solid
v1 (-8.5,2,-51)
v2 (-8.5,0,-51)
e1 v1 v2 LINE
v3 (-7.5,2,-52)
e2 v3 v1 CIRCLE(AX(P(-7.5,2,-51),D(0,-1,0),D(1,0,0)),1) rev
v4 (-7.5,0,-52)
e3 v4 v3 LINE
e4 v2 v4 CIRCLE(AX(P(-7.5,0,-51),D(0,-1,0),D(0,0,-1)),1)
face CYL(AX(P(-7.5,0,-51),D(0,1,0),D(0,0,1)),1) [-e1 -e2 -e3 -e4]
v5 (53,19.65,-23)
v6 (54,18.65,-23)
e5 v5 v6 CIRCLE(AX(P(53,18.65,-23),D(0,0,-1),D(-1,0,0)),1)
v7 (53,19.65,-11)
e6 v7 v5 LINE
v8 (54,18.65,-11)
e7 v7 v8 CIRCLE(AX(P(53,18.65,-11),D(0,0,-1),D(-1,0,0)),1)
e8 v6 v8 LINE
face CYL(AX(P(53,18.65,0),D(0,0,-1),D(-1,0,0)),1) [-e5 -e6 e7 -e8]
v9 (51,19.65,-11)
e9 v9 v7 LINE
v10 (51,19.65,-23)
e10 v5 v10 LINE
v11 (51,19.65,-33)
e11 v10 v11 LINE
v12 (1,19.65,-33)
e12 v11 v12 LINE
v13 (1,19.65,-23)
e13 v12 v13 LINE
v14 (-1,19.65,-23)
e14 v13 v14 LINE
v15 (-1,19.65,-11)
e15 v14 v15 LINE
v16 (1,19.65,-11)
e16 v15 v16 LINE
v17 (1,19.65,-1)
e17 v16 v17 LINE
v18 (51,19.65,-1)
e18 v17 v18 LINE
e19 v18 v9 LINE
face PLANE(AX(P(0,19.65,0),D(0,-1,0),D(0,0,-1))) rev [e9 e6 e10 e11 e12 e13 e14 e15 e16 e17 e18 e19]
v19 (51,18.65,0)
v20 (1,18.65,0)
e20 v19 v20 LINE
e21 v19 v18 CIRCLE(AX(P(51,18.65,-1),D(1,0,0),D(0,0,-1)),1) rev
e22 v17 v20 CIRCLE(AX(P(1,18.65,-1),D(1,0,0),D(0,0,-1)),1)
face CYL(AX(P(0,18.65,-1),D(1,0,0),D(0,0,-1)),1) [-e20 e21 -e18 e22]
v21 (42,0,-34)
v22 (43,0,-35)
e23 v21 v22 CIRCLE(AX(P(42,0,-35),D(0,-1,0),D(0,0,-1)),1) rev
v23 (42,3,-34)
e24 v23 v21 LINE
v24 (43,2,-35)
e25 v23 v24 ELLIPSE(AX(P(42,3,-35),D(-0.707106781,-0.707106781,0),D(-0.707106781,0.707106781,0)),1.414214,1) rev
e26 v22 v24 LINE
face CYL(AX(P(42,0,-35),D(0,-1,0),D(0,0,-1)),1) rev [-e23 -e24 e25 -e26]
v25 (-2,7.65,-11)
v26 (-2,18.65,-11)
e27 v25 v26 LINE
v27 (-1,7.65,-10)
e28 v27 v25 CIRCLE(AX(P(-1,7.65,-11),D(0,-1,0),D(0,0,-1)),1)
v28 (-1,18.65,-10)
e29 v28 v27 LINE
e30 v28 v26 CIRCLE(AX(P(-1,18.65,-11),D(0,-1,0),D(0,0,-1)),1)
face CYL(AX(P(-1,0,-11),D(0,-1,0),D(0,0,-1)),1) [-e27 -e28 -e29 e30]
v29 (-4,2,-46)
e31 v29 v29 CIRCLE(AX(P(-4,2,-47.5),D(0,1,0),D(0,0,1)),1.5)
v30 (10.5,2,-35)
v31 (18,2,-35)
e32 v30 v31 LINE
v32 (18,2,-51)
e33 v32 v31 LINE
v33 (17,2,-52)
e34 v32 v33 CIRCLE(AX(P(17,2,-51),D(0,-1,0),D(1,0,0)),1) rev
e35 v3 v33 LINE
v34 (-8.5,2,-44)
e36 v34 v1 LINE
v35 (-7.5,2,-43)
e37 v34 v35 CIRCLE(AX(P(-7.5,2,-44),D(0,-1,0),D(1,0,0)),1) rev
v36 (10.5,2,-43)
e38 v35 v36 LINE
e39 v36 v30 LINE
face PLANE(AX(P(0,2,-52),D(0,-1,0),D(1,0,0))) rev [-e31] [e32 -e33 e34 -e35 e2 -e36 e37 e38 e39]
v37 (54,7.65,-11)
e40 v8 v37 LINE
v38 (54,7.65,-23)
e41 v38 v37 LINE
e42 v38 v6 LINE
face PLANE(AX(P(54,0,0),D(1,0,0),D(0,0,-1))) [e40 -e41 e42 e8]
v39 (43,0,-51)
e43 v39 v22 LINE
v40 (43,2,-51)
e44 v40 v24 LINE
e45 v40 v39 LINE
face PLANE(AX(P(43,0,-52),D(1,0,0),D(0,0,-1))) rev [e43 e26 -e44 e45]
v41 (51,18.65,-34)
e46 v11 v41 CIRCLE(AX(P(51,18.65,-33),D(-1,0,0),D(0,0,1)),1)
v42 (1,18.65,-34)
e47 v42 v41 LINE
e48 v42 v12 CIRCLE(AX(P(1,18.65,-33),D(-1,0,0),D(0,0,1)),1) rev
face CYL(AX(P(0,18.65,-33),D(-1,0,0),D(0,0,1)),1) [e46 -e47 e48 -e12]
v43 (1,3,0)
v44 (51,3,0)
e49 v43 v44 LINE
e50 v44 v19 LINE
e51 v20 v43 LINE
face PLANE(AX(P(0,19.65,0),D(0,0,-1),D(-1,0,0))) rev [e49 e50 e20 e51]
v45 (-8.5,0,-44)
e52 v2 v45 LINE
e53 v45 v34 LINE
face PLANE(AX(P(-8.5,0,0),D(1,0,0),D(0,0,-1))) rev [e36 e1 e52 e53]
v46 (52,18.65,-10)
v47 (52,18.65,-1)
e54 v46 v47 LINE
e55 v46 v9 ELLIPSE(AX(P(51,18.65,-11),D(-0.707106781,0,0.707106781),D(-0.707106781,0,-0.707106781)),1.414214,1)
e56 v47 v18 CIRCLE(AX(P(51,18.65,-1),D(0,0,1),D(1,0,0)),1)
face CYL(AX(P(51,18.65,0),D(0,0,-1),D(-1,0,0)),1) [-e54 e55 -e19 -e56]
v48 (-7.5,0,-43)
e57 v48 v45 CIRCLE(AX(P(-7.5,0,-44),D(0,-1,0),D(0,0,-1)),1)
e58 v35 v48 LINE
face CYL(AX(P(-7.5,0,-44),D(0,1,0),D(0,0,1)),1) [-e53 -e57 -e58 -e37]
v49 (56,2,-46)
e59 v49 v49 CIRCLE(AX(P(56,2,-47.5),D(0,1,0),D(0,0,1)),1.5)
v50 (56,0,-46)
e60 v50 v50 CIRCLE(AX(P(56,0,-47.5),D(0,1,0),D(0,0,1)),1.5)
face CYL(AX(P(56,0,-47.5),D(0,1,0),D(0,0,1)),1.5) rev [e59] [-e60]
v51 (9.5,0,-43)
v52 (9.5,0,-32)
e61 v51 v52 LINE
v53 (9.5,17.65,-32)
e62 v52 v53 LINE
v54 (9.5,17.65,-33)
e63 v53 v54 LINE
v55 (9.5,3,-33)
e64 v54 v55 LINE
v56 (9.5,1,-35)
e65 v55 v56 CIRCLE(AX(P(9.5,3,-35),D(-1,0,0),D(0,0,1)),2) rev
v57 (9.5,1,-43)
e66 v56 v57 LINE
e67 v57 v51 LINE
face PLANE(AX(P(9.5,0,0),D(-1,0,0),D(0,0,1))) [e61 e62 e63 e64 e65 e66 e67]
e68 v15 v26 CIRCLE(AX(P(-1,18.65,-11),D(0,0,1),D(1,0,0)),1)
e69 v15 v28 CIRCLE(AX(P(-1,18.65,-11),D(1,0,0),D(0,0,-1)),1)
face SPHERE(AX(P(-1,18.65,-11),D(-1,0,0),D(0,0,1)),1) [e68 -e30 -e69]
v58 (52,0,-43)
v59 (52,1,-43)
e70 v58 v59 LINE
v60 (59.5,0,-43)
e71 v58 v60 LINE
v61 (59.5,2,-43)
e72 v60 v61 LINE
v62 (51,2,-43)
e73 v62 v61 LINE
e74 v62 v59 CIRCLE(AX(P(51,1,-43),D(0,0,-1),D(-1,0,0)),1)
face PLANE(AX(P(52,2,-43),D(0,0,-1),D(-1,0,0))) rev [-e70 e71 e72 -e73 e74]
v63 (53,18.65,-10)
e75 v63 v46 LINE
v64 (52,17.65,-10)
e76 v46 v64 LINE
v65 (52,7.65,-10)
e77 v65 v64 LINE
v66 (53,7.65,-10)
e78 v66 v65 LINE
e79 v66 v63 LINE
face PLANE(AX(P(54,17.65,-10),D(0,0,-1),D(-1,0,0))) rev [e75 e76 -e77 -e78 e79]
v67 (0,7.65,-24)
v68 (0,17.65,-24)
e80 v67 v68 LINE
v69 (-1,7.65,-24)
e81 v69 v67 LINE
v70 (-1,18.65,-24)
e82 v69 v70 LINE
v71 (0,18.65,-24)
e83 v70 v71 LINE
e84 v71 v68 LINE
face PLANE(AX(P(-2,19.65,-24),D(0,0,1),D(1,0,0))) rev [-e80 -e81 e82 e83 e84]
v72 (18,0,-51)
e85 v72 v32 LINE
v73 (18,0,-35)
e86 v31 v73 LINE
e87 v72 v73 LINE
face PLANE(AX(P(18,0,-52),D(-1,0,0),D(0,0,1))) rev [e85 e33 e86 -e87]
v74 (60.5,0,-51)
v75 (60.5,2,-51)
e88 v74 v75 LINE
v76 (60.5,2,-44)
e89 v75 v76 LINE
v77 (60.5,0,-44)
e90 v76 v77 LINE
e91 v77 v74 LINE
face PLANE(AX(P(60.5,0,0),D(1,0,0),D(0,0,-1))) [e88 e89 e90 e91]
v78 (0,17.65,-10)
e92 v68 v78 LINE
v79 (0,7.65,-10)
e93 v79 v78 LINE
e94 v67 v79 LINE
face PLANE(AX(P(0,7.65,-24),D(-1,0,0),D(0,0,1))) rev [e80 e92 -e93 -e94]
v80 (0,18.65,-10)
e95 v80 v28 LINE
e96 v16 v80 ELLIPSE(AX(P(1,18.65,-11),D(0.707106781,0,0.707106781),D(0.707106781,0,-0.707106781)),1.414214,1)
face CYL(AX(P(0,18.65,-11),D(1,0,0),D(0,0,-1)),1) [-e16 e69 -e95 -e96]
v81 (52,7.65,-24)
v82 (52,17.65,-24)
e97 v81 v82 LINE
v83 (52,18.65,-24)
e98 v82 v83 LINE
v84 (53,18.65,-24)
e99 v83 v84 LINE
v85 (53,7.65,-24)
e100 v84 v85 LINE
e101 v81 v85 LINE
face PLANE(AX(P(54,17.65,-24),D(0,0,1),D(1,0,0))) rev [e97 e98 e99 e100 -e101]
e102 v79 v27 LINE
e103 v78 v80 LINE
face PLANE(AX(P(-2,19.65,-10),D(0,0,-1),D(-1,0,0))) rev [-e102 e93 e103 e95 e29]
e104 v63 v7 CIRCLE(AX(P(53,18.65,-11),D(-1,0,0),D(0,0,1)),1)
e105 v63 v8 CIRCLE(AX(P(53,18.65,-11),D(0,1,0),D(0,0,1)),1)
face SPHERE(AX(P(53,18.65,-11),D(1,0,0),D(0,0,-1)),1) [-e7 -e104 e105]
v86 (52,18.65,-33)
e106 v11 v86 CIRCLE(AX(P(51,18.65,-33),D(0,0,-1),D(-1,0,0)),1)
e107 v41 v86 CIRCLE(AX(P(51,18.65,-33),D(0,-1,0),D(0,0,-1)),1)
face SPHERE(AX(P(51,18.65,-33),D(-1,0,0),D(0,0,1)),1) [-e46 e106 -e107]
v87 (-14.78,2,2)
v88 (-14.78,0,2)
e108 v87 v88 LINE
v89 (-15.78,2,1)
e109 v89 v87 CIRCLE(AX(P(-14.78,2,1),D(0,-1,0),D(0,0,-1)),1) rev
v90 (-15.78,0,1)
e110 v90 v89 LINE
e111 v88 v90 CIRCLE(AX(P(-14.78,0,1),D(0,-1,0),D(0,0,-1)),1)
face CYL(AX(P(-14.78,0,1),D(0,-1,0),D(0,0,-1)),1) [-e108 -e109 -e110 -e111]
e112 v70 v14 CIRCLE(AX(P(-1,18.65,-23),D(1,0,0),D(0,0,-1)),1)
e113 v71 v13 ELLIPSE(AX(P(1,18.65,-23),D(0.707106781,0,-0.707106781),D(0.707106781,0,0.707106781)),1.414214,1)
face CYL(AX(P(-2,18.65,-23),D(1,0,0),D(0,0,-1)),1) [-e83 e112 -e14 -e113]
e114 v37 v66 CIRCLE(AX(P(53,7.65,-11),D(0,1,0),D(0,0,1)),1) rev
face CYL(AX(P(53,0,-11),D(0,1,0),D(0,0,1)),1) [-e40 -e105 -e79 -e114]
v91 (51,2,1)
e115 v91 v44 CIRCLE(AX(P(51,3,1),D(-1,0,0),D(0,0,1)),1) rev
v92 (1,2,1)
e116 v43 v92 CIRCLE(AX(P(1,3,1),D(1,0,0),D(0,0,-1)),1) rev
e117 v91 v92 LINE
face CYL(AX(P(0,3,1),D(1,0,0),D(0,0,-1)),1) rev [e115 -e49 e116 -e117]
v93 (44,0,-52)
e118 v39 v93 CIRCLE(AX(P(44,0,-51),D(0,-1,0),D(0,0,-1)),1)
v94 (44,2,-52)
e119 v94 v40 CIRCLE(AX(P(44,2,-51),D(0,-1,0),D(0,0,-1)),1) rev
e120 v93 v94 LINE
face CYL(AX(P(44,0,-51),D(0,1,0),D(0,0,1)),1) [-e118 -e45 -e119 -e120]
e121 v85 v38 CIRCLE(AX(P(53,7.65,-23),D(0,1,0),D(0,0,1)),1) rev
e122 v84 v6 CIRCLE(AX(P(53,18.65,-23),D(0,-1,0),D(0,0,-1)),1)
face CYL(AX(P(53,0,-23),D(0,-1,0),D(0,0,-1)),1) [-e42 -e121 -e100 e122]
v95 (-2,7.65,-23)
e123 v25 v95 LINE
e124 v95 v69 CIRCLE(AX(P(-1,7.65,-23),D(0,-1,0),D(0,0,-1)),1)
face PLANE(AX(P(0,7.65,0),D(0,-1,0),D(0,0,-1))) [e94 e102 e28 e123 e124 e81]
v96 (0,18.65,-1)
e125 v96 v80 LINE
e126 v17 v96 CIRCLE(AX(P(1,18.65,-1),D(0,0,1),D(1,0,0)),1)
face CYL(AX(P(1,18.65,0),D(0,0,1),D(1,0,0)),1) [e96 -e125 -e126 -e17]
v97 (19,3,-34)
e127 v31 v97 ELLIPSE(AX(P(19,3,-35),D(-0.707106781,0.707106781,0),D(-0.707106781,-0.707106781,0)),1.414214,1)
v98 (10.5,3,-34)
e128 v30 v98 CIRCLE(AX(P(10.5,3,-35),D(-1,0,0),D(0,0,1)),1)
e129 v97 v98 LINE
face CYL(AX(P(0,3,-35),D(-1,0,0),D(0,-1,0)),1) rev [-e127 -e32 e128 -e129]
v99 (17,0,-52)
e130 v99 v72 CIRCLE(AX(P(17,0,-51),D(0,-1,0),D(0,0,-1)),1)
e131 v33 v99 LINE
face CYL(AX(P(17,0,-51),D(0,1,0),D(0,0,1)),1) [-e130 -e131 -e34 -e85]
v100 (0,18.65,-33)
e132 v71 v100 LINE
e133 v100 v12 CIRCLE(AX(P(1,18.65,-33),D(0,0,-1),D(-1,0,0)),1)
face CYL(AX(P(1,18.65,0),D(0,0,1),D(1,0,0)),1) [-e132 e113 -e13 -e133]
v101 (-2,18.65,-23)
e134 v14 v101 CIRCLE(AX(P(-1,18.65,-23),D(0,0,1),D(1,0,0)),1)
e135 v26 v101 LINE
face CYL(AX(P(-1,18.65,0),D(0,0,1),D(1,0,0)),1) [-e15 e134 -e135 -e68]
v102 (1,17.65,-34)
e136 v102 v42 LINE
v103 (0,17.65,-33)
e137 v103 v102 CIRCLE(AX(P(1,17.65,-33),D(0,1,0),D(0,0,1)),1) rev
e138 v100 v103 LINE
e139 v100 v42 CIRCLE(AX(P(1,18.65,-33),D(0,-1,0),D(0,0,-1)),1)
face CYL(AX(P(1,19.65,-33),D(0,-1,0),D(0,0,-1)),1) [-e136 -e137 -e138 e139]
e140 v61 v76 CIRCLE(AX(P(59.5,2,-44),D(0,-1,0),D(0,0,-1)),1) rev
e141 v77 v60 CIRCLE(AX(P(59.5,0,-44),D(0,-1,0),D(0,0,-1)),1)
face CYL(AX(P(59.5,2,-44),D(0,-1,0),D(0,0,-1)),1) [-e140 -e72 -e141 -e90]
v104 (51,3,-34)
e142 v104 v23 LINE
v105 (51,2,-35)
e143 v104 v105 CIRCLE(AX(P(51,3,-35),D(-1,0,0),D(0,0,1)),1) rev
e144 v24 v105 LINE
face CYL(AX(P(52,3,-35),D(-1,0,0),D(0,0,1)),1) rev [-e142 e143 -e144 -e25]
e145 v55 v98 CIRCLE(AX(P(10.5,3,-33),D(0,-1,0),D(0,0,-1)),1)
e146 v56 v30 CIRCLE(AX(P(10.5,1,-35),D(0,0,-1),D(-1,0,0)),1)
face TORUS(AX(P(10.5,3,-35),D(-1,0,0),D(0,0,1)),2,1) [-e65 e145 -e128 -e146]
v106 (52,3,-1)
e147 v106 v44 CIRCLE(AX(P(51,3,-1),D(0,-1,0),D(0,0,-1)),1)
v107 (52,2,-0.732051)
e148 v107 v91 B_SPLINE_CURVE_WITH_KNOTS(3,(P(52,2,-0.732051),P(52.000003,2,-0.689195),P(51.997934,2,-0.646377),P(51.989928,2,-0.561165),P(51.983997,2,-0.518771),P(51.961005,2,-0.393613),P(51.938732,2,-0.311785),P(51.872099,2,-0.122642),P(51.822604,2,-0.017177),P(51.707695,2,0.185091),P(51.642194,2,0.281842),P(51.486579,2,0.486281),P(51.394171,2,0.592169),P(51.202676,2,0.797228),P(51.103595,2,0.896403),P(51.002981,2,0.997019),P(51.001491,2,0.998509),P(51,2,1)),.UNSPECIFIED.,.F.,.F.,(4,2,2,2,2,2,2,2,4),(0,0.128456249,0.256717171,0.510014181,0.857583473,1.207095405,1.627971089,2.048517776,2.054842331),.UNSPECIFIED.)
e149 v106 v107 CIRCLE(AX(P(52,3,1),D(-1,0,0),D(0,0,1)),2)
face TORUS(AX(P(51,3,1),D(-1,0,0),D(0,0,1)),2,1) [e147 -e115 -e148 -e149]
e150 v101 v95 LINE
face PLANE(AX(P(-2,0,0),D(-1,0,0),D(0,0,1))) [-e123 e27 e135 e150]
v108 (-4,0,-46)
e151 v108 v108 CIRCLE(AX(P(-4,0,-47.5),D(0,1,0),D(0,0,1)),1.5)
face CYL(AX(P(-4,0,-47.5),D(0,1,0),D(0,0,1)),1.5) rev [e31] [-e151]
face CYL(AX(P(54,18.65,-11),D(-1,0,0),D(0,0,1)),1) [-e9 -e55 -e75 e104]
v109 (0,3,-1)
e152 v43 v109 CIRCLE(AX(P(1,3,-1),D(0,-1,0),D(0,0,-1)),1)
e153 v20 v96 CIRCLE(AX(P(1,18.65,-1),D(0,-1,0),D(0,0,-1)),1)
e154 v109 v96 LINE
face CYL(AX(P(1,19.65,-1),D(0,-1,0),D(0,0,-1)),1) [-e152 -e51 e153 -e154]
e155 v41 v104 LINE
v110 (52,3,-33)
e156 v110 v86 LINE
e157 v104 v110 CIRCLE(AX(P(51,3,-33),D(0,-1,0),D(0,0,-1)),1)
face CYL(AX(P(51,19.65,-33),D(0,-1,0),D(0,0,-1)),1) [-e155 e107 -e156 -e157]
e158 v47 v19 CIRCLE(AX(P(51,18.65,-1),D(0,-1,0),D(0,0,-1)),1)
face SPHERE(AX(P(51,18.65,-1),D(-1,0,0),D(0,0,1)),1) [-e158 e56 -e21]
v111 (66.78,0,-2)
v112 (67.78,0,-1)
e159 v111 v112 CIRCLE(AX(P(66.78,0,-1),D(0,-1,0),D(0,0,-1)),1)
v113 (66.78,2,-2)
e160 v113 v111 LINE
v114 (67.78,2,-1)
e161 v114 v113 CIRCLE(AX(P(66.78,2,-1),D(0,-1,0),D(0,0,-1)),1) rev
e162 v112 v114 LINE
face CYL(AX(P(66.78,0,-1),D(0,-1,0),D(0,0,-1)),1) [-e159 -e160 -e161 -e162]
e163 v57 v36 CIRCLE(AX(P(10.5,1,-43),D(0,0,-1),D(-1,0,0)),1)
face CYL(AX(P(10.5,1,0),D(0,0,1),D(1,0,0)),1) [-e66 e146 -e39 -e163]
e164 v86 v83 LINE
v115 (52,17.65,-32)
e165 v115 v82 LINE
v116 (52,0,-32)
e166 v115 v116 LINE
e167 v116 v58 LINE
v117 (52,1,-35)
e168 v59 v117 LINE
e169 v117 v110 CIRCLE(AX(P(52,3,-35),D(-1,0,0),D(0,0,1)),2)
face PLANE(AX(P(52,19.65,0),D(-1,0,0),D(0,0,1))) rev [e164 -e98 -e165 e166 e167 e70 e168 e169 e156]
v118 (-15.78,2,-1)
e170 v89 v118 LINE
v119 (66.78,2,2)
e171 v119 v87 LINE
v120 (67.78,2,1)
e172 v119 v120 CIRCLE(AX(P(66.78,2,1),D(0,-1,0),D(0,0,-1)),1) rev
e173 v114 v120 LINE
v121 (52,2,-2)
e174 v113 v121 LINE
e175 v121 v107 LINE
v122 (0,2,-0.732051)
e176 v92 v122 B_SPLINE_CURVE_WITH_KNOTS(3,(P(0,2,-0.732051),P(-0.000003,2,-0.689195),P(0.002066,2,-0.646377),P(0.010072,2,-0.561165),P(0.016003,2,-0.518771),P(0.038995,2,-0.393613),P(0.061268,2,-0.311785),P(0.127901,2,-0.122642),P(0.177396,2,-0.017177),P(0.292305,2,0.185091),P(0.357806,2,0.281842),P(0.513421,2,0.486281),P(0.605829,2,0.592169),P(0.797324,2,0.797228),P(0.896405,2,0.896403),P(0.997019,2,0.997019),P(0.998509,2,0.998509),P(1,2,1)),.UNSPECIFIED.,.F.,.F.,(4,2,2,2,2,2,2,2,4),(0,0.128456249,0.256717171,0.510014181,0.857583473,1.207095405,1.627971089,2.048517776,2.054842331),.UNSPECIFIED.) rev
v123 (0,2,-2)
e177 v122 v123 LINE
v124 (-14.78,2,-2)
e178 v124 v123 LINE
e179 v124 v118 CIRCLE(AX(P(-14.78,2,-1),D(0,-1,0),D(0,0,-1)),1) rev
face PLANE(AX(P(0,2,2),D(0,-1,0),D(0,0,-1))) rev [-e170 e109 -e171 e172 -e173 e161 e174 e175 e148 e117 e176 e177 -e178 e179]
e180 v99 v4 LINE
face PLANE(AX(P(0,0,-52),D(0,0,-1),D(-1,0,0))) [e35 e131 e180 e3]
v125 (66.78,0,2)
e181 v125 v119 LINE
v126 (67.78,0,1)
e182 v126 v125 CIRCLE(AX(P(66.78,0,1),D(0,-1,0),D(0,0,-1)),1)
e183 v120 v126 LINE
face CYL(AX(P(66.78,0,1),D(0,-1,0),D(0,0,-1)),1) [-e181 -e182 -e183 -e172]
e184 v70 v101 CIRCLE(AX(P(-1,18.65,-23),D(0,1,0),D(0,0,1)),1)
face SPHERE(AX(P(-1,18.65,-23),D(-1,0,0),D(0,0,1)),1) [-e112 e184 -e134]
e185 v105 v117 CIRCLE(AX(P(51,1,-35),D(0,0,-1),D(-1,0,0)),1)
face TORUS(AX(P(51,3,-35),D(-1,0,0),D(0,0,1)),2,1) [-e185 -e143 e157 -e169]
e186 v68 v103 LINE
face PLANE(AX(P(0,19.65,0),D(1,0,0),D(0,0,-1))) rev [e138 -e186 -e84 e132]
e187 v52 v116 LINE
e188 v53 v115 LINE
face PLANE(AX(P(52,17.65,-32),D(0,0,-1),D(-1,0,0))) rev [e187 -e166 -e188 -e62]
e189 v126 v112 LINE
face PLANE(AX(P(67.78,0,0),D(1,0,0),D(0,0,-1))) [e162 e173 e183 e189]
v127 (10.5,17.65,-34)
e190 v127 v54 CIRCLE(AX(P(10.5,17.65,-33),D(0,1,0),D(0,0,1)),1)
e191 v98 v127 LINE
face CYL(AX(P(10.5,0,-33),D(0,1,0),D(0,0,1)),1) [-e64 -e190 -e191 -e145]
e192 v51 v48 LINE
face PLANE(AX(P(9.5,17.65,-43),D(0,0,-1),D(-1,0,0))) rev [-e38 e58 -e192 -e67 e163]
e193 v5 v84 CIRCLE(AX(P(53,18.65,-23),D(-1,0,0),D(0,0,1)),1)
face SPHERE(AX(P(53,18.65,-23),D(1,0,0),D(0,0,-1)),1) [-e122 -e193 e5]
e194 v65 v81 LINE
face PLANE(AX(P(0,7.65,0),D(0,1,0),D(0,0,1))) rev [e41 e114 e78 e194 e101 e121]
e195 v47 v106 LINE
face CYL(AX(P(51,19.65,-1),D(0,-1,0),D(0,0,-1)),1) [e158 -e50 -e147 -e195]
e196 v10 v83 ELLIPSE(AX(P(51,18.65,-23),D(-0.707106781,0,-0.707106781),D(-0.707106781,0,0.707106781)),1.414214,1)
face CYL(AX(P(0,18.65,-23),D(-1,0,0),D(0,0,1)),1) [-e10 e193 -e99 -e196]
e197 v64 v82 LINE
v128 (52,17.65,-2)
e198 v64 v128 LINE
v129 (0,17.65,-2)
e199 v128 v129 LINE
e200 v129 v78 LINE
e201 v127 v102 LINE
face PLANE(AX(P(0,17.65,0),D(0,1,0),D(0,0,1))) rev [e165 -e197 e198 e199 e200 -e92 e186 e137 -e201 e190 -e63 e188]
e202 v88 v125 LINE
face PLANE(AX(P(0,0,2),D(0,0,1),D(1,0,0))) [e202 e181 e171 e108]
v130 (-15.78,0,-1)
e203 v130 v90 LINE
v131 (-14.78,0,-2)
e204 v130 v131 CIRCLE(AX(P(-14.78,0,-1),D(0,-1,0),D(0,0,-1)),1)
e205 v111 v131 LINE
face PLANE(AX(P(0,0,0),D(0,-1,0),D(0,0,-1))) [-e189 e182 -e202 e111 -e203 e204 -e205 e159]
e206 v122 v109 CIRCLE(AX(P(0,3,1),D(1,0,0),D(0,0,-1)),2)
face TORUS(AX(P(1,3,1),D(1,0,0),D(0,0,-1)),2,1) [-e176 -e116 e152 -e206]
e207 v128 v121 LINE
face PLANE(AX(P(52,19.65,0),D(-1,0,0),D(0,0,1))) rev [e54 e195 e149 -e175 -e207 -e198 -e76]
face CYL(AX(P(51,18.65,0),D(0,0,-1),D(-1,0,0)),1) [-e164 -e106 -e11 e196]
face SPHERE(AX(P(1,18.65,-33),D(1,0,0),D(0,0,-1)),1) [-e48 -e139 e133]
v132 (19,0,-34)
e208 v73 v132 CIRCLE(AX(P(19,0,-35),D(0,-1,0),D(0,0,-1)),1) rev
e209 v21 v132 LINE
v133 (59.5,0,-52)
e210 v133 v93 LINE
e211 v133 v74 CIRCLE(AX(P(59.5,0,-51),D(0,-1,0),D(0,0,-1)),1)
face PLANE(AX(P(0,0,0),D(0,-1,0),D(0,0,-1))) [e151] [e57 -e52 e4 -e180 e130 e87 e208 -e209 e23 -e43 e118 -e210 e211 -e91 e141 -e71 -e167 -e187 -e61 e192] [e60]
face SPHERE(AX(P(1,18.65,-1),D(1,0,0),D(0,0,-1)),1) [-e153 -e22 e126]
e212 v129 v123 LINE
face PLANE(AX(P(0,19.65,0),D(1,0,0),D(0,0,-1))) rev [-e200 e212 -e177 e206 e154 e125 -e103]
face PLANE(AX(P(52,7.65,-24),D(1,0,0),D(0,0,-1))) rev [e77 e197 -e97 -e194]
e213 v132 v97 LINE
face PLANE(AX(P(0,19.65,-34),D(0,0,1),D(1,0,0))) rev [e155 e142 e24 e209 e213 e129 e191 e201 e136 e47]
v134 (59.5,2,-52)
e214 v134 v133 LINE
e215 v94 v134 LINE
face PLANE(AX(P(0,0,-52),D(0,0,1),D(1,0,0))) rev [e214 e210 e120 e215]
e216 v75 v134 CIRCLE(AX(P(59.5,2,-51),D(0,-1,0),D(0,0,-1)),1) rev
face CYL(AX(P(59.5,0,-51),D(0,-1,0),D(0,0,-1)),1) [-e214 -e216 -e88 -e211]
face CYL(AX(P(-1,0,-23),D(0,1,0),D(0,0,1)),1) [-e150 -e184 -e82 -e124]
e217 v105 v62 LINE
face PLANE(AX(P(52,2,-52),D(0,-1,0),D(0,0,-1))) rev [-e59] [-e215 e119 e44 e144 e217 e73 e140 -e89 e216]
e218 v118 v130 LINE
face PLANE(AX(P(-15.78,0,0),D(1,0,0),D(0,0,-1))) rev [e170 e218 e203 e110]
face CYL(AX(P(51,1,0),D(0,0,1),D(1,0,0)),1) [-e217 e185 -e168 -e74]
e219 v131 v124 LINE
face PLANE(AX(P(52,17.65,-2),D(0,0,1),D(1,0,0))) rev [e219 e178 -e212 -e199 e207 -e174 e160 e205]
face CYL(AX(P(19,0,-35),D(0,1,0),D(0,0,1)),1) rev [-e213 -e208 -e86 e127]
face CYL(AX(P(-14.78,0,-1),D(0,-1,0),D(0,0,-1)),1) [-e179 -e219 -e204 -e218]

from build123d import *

# Parameters (mm, degrees)
SKETCH1_W            = 52
SKETCH1_H            = 34
BOSS_EXTRUDE1_DEPTH  = 19.65
SKETCH2_W            = 52
SKETCH2_H            = 30
CUT_EXTRUDE1_DEPTH   = 17.65
SKETCH3_W            = 9
SKETCH3_H            = 2
SKETCH3_W_2          = 18
BOSS_EXTRUDE2_DEPTH  = 18
SKETCH4_W            = 18
SKETCH4_H            = 2
BOSS_EXTRUDE3_DEPTH  = 8.5
SKETCH5_W            = 18
SKETCH5_H            = 2
BOSS_EXTRUDE4_DEPTH  = 8.5
SKETCH6_R            = 1.5
CUT_EXTRUDE2_DEPTH   = 82.705400678
SKETCH7_W            = 52
SKETCH7_H            = 2
BOSS_EXTRUDE5_DEPTH  = 2
SKETCH8_W            = 4
SKETCH8_H            = 2
BOSS_EXTRUDE6_DEPTH  = 15.78
SKETCH9_W            = 4
SKETCH9_H            = 2
BOSS_EXTRUDE7_DEPTH  = 15.78
SKETCH11_W           = 11
SKETCH11_H           = 17.65
CUT_EXTRUDE3_DEPTH   = 18
SKETCH12_W           = 9
SKETCH12_H           = 2
CUT_EXTRUDE4_DEPTH   = 8.5
SKETCH14_W           = 14
SKETCH14_H           = 2
BOSS_EXTRUDE8_DEPTH  = 2
SKETCH15_W           = 14
SKETCH15_H           = 2
BOSS_EXTRUDE9_DEPTH  = 2
SKETCH16_W           = 2
SKETCH16_H           = 14
BOSS_EXTRUDE10_DEPTH = 10
FILLET1_R            = 1
FILLET2_R            = 1
FILLET3_R            = 1
FILLET4_R            = 1


with BuildPart() as part:
    # Sketch1 → Boss-Extrude1 (new body)
    with BuildSketch(Plane(origin=(0, 0, 0), x_dir=(1, 0, 0), z_dir=(0, 1, 0))):
        with Locations((26, 17)):
            Rectangle(SKETCH1_W, SKETCH1_H)
    extrude(amount=BOSS_EXTRUDE1_DEPTH)

    # Sketch2 → Cut-Extrude1 (cut)
    with BuildSketch(Plane(origin=(0, 0, 0), x_dir=(-1, 0, 0), z_dir=(0, -1, 0))):
        with Locations((-26, 17)):
            Rectangle(SKETCH2_W, SKETCH2_H)
    extrude(amount=-CUT_EXTRUDE1_DEPTH, mode=Mode.SUBTRACT)

    # Sketch3 → Boss-Extrude2 (add)
    with BuildSketch(Plane(origin=(0, 0, -34), x_dir=(-1, 0, 0), z_dir=(0, 0, -1))):
        with Locations((-47.5, 1)):
            Rectangle(SKETCH3_W, SKETCH3_H)
        with Locations((-9, 1)):
            Rectangle(SKETCH3_W_2, SKETCH3_H)
    extrude(amount=BOSS_EXTRUDE2_DEPTH)

    # Sketch4 → Boss-Extrude3 (add)
    with BuildSketch(Plane(origin=(52, 0, 0), x_dir=(0, 0, -1), z_dir=(1, 0, 0))):
        with Locations((43, 1)):
            Rectangle(SKETCH4_W, SKETCH4_H)
    extrude(amount=BOSS_EXTRUDE3_DEPTH)

    # Sketch5 → Boss-Extrude4 (add)
    with BuildSketch(Plane.ZY):
        with Locations((-43, 1)):
            Rectangle(SKETCH5_W, SKETCH5_H)
    extrude(amount=BOSS_EXTRUDE4_DEPTH)

    # Sketch6 → Cut-Extrude2 (cut, through all)
    with BuildSketch(Plane(origin=(0, 2, 0), x_dir=(1, 0, 0), z_dir=(0, 1, 0))):
        with Locations(Location((56, 47.5, 0), (0, 0, 270))):
            Circle(SKETCH6_R)
        with Locations(Location((-4, 47.5, 0), (0, 0, 270))):
            Circle(SKETCH6_R)
    extrude(amount=-CUT_EXTRUDE2_DEPTH, mode=Mode.SUBTRACT)

    # Sketch7 → Boss-Extrude5 (add)
    with BuildSketch(Plane.XY):
        with Locations((26, 1)):
            Rectangle(SKETCH7_W, SKETCH7_H)
    extrude(amount=BOSS_EXTRUDE5_DEPTH)

    # Sketch8 → Boss-Extrude6 (add)
    with BuildSketch(Plane.ZY):
        with Locations((0, 1)):
            Rectangle(SKETCH8_W, SKETCH8_H)
    extrude(amount=BOSS_EXTRUDE6_DEPTH)

    # Sketch9 → Boss-Extrude7 (add)
    with BuildSketch(Plane(origin=(52, 0, 0), x_dir=(0, 0, -1), z_dir=(1, 0, 0))):
        with Locations((0, 1)):
            Rectangle(SKETCH9_W, SKETCH9_H)
    extrude(amount=BOSS_EXTRUDE7_DEPTH)

    # Sketch11 → Cut-Extrude3 (cut)
    with BuildSketch(Plane.ZY.offset(8.5)):
        with Locations((-37.5, 8.825)):
            Rectangle(SKETCH11_W, SKETCH11_H)
    extrude(amount=-CUT_EXTRUDE3_DEPTH, mode=Mode.SUBTRACT)

    # Sketch12 → Cut-Extrude4 (cut)
    with BuildSketch(Plane(origin=(60.5, 0, 0), x_dir=(0, 0, -1), z_dir=(1, 0, 0))):
        with Locations((38.5, 1)):
            Rectangle(SKETCH12_W, SKETCH12_H)
    extrude(amount=-CUT_EXTRUDE4_DEPTH, mode=Mode.SUBTRACT)

    # Sketch14 → Boss-Extrude8 (add)
    with BuildSketch(Plane.ZY):
        with Locations((-17, 18.65)):
            Rectangle(SKETCH14_W, SKETCH14_H)
    extrude(amount=BOSS_EXTRUDE8_DEPTH)

    # Sketch15 → Boss-Extrude9 (add)
    with BuildSketch(Plane(origin=(52, 0, 0), x_dir=(0, 0, -1), z_dir=(1, 0, 0))):
        with Locations((17, 18.65)):
            Rectangle(SKETCH15_W, SKETCH15_H)
    extrude(amount=BOSS_EXTRUDE9_DEPTH)

    # Sketch16 → Boss-Extrude10 (add)
    with BuildSketch(Plane(origin=(0, 17.65, 0), x_dir=(-1, 0, 0), z_dir=(0, -1, 0))):
        with Locations((1, 17)):
            Rectangle(SKETCH16_W, SKETCH16_H)
        with Locations((-53, 17)):
            Rectangle(SKETCH16_W, SKETCH16_H)
    extrude(amount=BOSS_EXTRUDE10_DEPTH)

    # Fillet1
    fillet1_edges = [part.edges().sort_by_distance(p)[0] for p in [
        (13.75, 2, -34),
        (26, 19.65, -34),
        (43, 1, -34),
        (47.5, 2, -34),
        (18, 1, -34),
        (26, 19.65, 0),
        (26, 2, 0),
    ]]
    fillet(fillet1_edges, radius=FILLET1_R)

    # Fillet2
    # the kernel refuses this fillet: 1 mm, written as the material it takes off along each edge
    with BuildSketch(Plane(origin=(9.5, 2, -35), x_dir=(0, -1, 0), z_dir=(0, 0, -1))) as fillet2_piece_1:
        with BuildLine():
            CenterArc((FILLET2_R, -FILLET2_R), FILLET2_R, 90, 90)
            Line((0, -FILLET2_R), (0, 0))
            Line((0, 0), (FILLET2_R, 0))
        make_face()
    extrude(amount=8, mode=Mode.SUBTRACT)
    with BuildSketch(Plane(origin=(9.5, 3, -35), x_dir=(0, 0, 1), z_dir=(0, 1, 0))) as fillet2_piece_2:
        with BuildLine():
            CenterArc((1 + FILLET2_R, FILLET2_R), FILLET2_R, 180, 90)
            Line((1, FILLET2_R), (1, 0))
            Line((1, 0), (1 + FILLET2_R, 0))
        make_face()
    revolve(axis=Axis((9.5, 3, -35), (1, 0, 0)), revolution_arc=90, mode=Mode.SUBTRACT)
    with BuildSketch(Plane(origin=(0, 15.15, -34), x_dir=(0, 0, 1), z_dir=(0, 1, 0))) as fillet2_piece_3:
        with BuildLine():
            CenterArc((FILLET2_R, FILLET2_R), FILLET2_R, 180, 90)
            Line((0, FILLET2_R), (0, 0))
            Line((0, 0), (FILLET2_R, 0))
        make_face()
    extrude(amount=3.5, mode=Mode.SUBTRACT)
    with BuildSketch(Plane(origin=(0, 18.65, -33), x_dir=(0, 0, -1), z_dir=(0, -1, 0))) as fillet2_piece_4:
        with BuildLine():
            CenterArc((1 - FILLET2_R, FILLET2_R), FILLET2_R, 270, 90)
            Line((1, FILLET2_R), (1, 0))
            Line((1, 0), (1 - FILLET2_R, 0))
        make_face()
    revolve(axis=Axis((0, 18.65, -33), (1, 0, 0)), revolution_arc=90, mode=Mode.SUBTRACT)
    with BuildSketch(Plane(origin=(0, 3, 1), x_dir=(0, 0, -1), z_dir=(0, 1, 0))) as fillet2_piece_5_section:
        with BuildLine():
            CenterArc((1 + FILLET2_R, -FILLET2_R), FILLET2_R, 90, 90)
            Line((1, -FILLET2_R), (1, 0))
            Line((1, 0), (1 + FILLET2_R, 0))
        make_face()
    fillet2_piece_5 = revolve(axis=Axis((0, 3, 1), (-1, 0, 0)), revolution_arc=233.296989237, mode=Mode.PRIVATE)
    fillet2_piece_5 = split(fillet2_piece_5, bisect_by=Plane(origin=(0, 2, 1), z_dir=(0, 1, 0)), keep=Keep.TOP, mode=Mode.PRIVATE)
    add(fillet2_piece_5, mode=Mode.SUBTRACT)
    with BuildSketch(Plane(origin=(0, 3, 0), x_dir=(1, 0, 0), z_dir=(0, 1, 0)), Plane(origin=(52, 3, -34), x_dir=(-1, 0, 0), z_dir=(0, 1, 0))) as fillet2_piece_6:
        with BuildLine():
            CenterArc((FILLET2_R, FILLET2_R), FILLET2_R, 180, 90)
            Line((0, FILLET2_R), (0, 0))
            Line((0, 0), (FILLET2_R, 0))
        make_face()
    extrude(amount=15.65, mode=Mode.SUBTRACT)
    with BuildSketch(Plane(origin=(0, 18.65, -1), x_dir=(0, 0, 1), z_dir=(0, -1, 0))) as fillet2_piece_7:
        with BuildLine():
            CenterArc((1 - FILLET2_R, -FILLET2_R), FILLET2_R, 0, 90)
            Line((1, -FILLET2_R), (1, 0))
            Line((1, 0), (1 - FILLET2_R, 0))
        make_face()
    revolve(axis=Axis((0, 18.65, -1), (-1, 0, 0)), revolution_arc=90, mode=Mode.SUBTRACT)
    with BuildSketch(Plane(origin=(52, 2, -43), x_dir=(-1, 0, 0), z_dir=(0, 0, 1))) as fillet2_piece_8:
        with BuildLine():
            CenterArc((FILLET2_R, FILLET2_R), FILLET2_R, 180, 90)
            Line((0, FILLET2_R), (0, 0))
            Line((0, 0), (FILLET2_R, 0))
        make_face()
    extrude(amount=8, mode=Mode.SUBTRACT)
    with BuildSketch(Plane(origin=(52, 3, -35), x_dir=(0, 0, 1), z_dir=(0, 1, 0))) as fillet2_piece_9:
        with BuildLine():
            CenterArc((1 + FILLET2_R, -FILLET2_R), FILLET2_R, 90, 90)
            Line((1 + FILLET2_R, 0), (1, 0))
            Line((1, 0), (1, -FILLET2_R))
        make_face()
    revolve(axis=Axis((52, 3, -35), (1, 0, 0)), revolution_arc=90, mode=Mode.SUBTRACT)
    with BuildSketch(Plane(origin=(52, 18.65, -33), x_dir=(0, 0, -1), z_dir=(0, -1, 0))) as fillet2_piece_10:
        with BuildLine():
            CenterArc((1 - FILLET2_R, -FILLET2_R), FILLET2_R, 0, 90)
            Line((1 - FILLET2_R, 0), (1, 0))
            Line((1, 0), (1, -FILLET2_R))
        make_face()
    revolve(axis=Axis((52, 18.65, -33), (1, 0, 0)), revolution_arc=90, mode=Mode.SUBTRACT)
    with BuildSketch(Plane(origin=(52, 3, 1), x_dir=(0, 0, -1), z_dir=(0, 1, 0))) as fillet2_piece_11_section:
        with BuildLine():
            CenterArc((1 + FILLET2_R, FILLET2_R), FILLET2_R, 180, 90)
            Line((1 + FILLET2_R, 0), (1, 0))
            Line((1, 0), (1, FILLET2_R))
        make_face()
    fillet2_piece_11 = revolve(axis=Axis((52, 3, 1), (-1, 0, 0)), revolution_arc=233.296989237, mode=Mode.PRIVATE)
    fillet2_piece_11 = split(fillet2_piece_11, bisect_by=Plane(origin=(52, 2, 1), z_dir=(0, 1, 0)), keep=Keep.TOP, mode=Mode.PRIVATE)
    add(fillet2_piece_11, mode=Mode.SUBTRACT)
    with BuildSketch(Plane(origin=(52, 3, 0), x_dir=(-1, 0, 0), z_dir=(0, 1, 0))) as fillet2_piece_12:
        with BuildLine():
            CenterArc((FILLET2_R, -FILLET2_R), FILLET2_R, 90, 90)
            Line((0, -FILLET2_R), (0, 0))
            Line((0, 0), (FILLET2_R, 0))
        make_face()
    extrude(amount=15.65, mode=Mode.SUBTRACT)
    with BuildSketch(Plane(origin=(52, 18.65, -1), x_dir=(0, 0, 1), z_dir=(0, -1, 0))) as fillet2_piece_13:
        with BuildLine():
            CenterArc((1 - FILLET2_R, FILLET2_R), FILLET2_R, 270, 90)
            Line((1 - FILLET2_R, 0), (1, 0))
            Line((1, 0), (1, FILLET2_R))
        make_face()
    revolve(axis=Axis((52, 18.65, -1), (-1, 0, 0)), revolution_arc=90, mode=Mode.SUBTRACT)
    with BuildSketch(Plane(origin=(9.5, 3, -34), x_dir=(1, 0, 0), z_dir=(0, 1, 0))) as fillet2_piece_14:
        with BuildLine():
            CenterArc((FILLET2_R, -FILLET2_R), FILLET2_R, 90, 90)
            Line((0, -FILLET2_R), (0, 0))
            Line((0, 0), (FILLET2_R, 0))
        make_face()
    extrude(amount=14.65, mode=Mode.SUBTRACT)
    with BuildSketch(Plane(origin=(0, 19.65, -24), x_dir=(0, 0, 1), z_dir=(-1, 0, 0)), Plane(origin=(52, 19.65, -10), x_dir=(0, 0, -1), z_dir=(1, 0, 0))) as fillet2_piece_15:
        with BuildLine():
            CenterArc((FILLET2_R, -FILLET2_R), FILLET2_R, 90, 90)
            Line((0, -FILLET2_R), (0, 0))
            Line((0, 0), (FILLET2_R, 0))
        make_face()
    extrude(amount=4.5, mode=Mode.SUBTRACT)
    with BuildSketch(Plane(origin=(0, 19.65, -33), x_dir=(1, 0, 0), z_dir=(0, 0, 1)), Plane(origin=(52, 19.65, -24), x_dir=(-1, 0, 0), z_dir=(0, 0, -1)), Plane(origin=(52, 19.65, -1), x_dir=(-1, 0, 0), z_dir=(0, 0, -1))) as fillet2_piece_16:
        with BuildLine():
            CenterArc((FILLET2_R, -FILLET2_R), FILLET2_R, 90, 90)
            Line((0, -FILLET2_R), (0, 0))
            Line((0, 0), (FILLET2_R, 0))
        make_face()
    extrude(amount=9, mode=Mode.SUBTRACT)
    with BuildSketch(Plane(origin=(0, 19.65, -10), x_dir=(0, 0, -1), z_dir=(-1, 0, 0)), Plane(origin=(52, 19.65, -24), x_dir=(0, 0, 1), z_dir=(1, 0, 0))) as fillet2_piece_17:
        with BuildLine():
            CenterArc((FILLET2_R, FILLET2_R), FILLET2_R, 180, 90)
            Line((0, FILLET2_R), (0, 0))
            Line((0, 0), (FILLET2_R, 0))
        make_face()
    extrude(amount=4.5, mode=Mode.SUBTRACT)
    with BuildSketch(Plane(origin=(0, 19.65, -10), x_dir=(0, -1, 0), z_dir=(0, 0, 1))) as fillet2_piece_18:
        with BuildLine():
            CenterArc((FILLET2_R, FILLET2_R), FILLET2_R, 180, 90)
            Line((0, FILLET2_R), (0, 0))
            Line((0, 0), (FILLET2_R, 0))
        make_face()
    extrude(amount=9, mode=Mode.SUBTRACT)
    with BuildSketch(Plane(origin=(2.5, 19.65, -24), x_dir=(0, 0, 1), z_dir=(-1, 0, 0))) as fillet2_piece_19a_section:
        with BuildLine():
            CenterArc((FILLET2_R, -FILLET2_R), FILLET2_R, 90, 90)
            Line((0, -FILLET2_R), (0, 0))
            Line((0, 0), (FILLET2_R, 0))
        make_face()
    fillet2_piece_19a = extrude(amount=4.5, mode=Mode.PRIVATE)
    fillet2_piece_19a = split(fillet2_piece_19a, bisect_by=Plane(origin=(0, 19.65, -24), z_dir=(1, 0, 0)), keep=Keep.TOP, mode=Mode.PRIVATE)
    with BuildSketch(Plane(origin=(0, 19.65, -33), x_dir=(1, 0, 0), z_dir=(0, 0, 1))) as fillet2_piece_19b_section:
        with BuildLine():
            CenterArc((FILLET2_R, -FILLET2_R), FILLET2_R, 90, 90)
            Line((0, -FILLET2_R), (0, 0))
            Line((0, 0), (FILLET2_R, 0))
        make_face()
    fillet2_piece_19b = extrude(amount=11.5, mode=Mode.PRIVATE)
    fillet2_piece_19b = split(fillet2_piece_19b, bisect_by=Plane(origin=(0, 19.65, -24), z_dir=(0, 0, 1)), keep=Keep.TOP, mode=Mode.PRIVATE)
    fillet2_piece_19 = fillet2_piece_19a & fillet2_piece_19b
    add(fillet2_piece_19, mode=Mode.SUBTRACT)
    with BuildSketch(Plane(origin=(0, 19.65, -12.5), x_dir=(0, -1, 0), z_dir=(0, 0, 1))) as fillet2_piece_20a_section:
        with BuildLine():
            CenterArc((FILLET2_R, FILLET2_R), FILLET2_R, 180, 90)
            Line((0, FILLET2_R), (0, 0))
            Line((0, 0), (FILLET2_R, 0))
        make_face()
    fillet2_piece_20a = extrude(amount=11.5, mode=Mode.PRIVATE)
    fillet2_piece_20a = split(fillet2_piece_20a, bisect_by=Plane(origin=(0, 19.65, -10), z_dir=(0, 0, -1)), keep=Keep.TOP, mode=Mode.PRIVATE)
    with BuildSketch(Plane(origin=(2.5, 19.65, -10), x_dir=(0, 0, -1), z_dir=(-1, 0, 0))) as fillet2_piece_20b_section:
        with BuildLine():
            CenterArc((FILLET2_R, FILLET2_R), FILLET2_R, 180, 90)
            Line((0, FILLET2_R), (0, 0))
            Line((0, 0), (FILLET2_R, 0))
        make_face()
    fillet2_piece_20b = extrude(amount=4.5, mode=Mode.PRIVATE)
    fillet2_piece_20b = split(fillet2_piece_20b, bisect_by=Plane(origin=(0, 19.65, -10), z_dir=(1, 0, 0)), keep=Keep.TOP, mode=Mode.PRIVATE)
    fillet2_piece_20 = fillet2_piece_20a & fillet2_piece_20b
    add(fillet2_piece_20, mode=Mode.SUBTRACT)
    with BuildSketch(Plane(origin=(49.5, 19.65, -24), x_dir=(0, 0, 1), z_dir=(1, 0, 0))) as fillet2_piece_21a_section:
        with BuildLine():
            CenterArc((FILLET2_R, FILLET2_R), FILLET2_R, 180, 90)
            Line((0, FILLET2_R), (0, 0))
            Line((0, 0), (FILLET2_R, 0))
        make_face()
    fillet2_piece_21a = extrude(amount=4.5, mode=Mode.PRIVATE)
    fillet2_piece_21a = split(fillet2_piece_21a, bisect_by=Plane(origin=(52, 19.65, -24), z_dir=(-1, 0, 0)), keep=Keep.TOP, mode=Mode.PRIVATE)
    with BuildSketch(Plane(origin=(52, 19.65, -21.5), x_dir=(-1, 0, 0), z_dir=(0, 0, -1))) as fillet2_piece_21b_section:
        with BuildLine():
            CenterArc((FILLET2_R, -FILLET2_R), FILLET2_R, 90, 90)
            Line((0, -FILLET2_R), (0, 0))
            Line((0, 0), (FILLET2_R, 0))
        make_face()
    fillet2_piece_21b = extrude(amount=11.5, mode=Mode.PRIVATE)
    fillet2_piece_21b = split(fillet2_piece_21b, bisect_by=Plane(origin=(52, 19.65, -24), z_dir=(0, 0, 1)), keep=Keep.TOP, mode=Mode.PRIVATE)
    fillet2_piece_21 = fillet2_piece_21a & fillet2_piece_21b
    add(fillet2_piece_21, mode=Mode.SUBTRACT)
    with BuildSketch(Plane(origin=(52, 19.65, -1), x_dir=(-1, 0, 0), z_dir=(0, 0, -1))) as fillet2_piece_22a_section:
        with BuildLine():
            CenterArc((FILLET2_R, -FILLET2_R), FILLET2_R, 90, 90)
            Line((0, -FILLET2_R), (0, 0))
            Line((0, 0), (FILLET2_R, 0))
        make_face()
    fillet2_piece_22a = extrude(amount=11.5, mode=Mode.PRIVATE)
    fillet2_piece_22a = split(fillet2_piece_22a, bisect_by=Plane(origin=(52, 19.65, -10), z_dir=(0, 0, -1)), keep=Keep.TOP, mode=Mode.PRIVATE)
    with BuildSketch(Plane(origin=(49.5, 19.65, -10), x_dir=(0, 0, -1), z_dir=(1, 0, 0))) as fillet2_piece_22b_section:
        with BuildLine():
            CenterArc((FILLET2_R, -FILLET2_R), FILLET2_R, 90, 90)
            Line((0, -FILLET2_R), (0, 0))
            Line((0, 0), (FILLET2_R, 0))
        make_face()
    fillet2_piece_22b = extrude(amount=4.5, mode=Mode.PRIVATE)
    fillet2_piece_22b = split(fillet2_piece_22b, bisect_by=Plane(origin=(52, 19.65, -10), z_dir=(-1, 0, 0)), keep=Keep.TOP, mode=Mode.PRIVATE)
    fillet2_piece_22 = fillet2_piece_22a & fillet2_piece_22b
    add(fillet2_piece_22, mode=Mode.SUBTRACT)

    # Fillet3
    fillet3_edges = [part.edges().sort_by_distance(p)[0] for p in [
        (-2, 13.15, -10),
        (54, 13.15, -24),
        (-2, 13.15, -24),
        (-2, 19.65, -17),
        (54, 19.65, -17),
        (-2, 19.357106781, -10.292893219),
        (-2, 19.357106781, -23.707106781),
        (54, 13.15, -10),
        (54, 19.357106781, -10.292893219),
        (54, 19.357106781, -23.707106781),
    ]]
    fillet(fillet3_edges, radius=FILLET3_R)

    # Fillet4
    fillet4_edges = [part.edges().sort_by_distance(p)[0] for p in [
        (-15.78, 1, 2),
        (-15.78, 1, -2),
        (67.78, 1, 2),
        (67.78, 1, -2),
        (-8.5, 1, -43),
        (60.5, 1, -43),
        (43, 1, -52),
        (18, 1, -52),
        (60.5, 1, -52),
        (-8.5, 1, -52),
    ]]
    fillet(fillet4_edges, radius=FILLET4_R)


solid = part.part
